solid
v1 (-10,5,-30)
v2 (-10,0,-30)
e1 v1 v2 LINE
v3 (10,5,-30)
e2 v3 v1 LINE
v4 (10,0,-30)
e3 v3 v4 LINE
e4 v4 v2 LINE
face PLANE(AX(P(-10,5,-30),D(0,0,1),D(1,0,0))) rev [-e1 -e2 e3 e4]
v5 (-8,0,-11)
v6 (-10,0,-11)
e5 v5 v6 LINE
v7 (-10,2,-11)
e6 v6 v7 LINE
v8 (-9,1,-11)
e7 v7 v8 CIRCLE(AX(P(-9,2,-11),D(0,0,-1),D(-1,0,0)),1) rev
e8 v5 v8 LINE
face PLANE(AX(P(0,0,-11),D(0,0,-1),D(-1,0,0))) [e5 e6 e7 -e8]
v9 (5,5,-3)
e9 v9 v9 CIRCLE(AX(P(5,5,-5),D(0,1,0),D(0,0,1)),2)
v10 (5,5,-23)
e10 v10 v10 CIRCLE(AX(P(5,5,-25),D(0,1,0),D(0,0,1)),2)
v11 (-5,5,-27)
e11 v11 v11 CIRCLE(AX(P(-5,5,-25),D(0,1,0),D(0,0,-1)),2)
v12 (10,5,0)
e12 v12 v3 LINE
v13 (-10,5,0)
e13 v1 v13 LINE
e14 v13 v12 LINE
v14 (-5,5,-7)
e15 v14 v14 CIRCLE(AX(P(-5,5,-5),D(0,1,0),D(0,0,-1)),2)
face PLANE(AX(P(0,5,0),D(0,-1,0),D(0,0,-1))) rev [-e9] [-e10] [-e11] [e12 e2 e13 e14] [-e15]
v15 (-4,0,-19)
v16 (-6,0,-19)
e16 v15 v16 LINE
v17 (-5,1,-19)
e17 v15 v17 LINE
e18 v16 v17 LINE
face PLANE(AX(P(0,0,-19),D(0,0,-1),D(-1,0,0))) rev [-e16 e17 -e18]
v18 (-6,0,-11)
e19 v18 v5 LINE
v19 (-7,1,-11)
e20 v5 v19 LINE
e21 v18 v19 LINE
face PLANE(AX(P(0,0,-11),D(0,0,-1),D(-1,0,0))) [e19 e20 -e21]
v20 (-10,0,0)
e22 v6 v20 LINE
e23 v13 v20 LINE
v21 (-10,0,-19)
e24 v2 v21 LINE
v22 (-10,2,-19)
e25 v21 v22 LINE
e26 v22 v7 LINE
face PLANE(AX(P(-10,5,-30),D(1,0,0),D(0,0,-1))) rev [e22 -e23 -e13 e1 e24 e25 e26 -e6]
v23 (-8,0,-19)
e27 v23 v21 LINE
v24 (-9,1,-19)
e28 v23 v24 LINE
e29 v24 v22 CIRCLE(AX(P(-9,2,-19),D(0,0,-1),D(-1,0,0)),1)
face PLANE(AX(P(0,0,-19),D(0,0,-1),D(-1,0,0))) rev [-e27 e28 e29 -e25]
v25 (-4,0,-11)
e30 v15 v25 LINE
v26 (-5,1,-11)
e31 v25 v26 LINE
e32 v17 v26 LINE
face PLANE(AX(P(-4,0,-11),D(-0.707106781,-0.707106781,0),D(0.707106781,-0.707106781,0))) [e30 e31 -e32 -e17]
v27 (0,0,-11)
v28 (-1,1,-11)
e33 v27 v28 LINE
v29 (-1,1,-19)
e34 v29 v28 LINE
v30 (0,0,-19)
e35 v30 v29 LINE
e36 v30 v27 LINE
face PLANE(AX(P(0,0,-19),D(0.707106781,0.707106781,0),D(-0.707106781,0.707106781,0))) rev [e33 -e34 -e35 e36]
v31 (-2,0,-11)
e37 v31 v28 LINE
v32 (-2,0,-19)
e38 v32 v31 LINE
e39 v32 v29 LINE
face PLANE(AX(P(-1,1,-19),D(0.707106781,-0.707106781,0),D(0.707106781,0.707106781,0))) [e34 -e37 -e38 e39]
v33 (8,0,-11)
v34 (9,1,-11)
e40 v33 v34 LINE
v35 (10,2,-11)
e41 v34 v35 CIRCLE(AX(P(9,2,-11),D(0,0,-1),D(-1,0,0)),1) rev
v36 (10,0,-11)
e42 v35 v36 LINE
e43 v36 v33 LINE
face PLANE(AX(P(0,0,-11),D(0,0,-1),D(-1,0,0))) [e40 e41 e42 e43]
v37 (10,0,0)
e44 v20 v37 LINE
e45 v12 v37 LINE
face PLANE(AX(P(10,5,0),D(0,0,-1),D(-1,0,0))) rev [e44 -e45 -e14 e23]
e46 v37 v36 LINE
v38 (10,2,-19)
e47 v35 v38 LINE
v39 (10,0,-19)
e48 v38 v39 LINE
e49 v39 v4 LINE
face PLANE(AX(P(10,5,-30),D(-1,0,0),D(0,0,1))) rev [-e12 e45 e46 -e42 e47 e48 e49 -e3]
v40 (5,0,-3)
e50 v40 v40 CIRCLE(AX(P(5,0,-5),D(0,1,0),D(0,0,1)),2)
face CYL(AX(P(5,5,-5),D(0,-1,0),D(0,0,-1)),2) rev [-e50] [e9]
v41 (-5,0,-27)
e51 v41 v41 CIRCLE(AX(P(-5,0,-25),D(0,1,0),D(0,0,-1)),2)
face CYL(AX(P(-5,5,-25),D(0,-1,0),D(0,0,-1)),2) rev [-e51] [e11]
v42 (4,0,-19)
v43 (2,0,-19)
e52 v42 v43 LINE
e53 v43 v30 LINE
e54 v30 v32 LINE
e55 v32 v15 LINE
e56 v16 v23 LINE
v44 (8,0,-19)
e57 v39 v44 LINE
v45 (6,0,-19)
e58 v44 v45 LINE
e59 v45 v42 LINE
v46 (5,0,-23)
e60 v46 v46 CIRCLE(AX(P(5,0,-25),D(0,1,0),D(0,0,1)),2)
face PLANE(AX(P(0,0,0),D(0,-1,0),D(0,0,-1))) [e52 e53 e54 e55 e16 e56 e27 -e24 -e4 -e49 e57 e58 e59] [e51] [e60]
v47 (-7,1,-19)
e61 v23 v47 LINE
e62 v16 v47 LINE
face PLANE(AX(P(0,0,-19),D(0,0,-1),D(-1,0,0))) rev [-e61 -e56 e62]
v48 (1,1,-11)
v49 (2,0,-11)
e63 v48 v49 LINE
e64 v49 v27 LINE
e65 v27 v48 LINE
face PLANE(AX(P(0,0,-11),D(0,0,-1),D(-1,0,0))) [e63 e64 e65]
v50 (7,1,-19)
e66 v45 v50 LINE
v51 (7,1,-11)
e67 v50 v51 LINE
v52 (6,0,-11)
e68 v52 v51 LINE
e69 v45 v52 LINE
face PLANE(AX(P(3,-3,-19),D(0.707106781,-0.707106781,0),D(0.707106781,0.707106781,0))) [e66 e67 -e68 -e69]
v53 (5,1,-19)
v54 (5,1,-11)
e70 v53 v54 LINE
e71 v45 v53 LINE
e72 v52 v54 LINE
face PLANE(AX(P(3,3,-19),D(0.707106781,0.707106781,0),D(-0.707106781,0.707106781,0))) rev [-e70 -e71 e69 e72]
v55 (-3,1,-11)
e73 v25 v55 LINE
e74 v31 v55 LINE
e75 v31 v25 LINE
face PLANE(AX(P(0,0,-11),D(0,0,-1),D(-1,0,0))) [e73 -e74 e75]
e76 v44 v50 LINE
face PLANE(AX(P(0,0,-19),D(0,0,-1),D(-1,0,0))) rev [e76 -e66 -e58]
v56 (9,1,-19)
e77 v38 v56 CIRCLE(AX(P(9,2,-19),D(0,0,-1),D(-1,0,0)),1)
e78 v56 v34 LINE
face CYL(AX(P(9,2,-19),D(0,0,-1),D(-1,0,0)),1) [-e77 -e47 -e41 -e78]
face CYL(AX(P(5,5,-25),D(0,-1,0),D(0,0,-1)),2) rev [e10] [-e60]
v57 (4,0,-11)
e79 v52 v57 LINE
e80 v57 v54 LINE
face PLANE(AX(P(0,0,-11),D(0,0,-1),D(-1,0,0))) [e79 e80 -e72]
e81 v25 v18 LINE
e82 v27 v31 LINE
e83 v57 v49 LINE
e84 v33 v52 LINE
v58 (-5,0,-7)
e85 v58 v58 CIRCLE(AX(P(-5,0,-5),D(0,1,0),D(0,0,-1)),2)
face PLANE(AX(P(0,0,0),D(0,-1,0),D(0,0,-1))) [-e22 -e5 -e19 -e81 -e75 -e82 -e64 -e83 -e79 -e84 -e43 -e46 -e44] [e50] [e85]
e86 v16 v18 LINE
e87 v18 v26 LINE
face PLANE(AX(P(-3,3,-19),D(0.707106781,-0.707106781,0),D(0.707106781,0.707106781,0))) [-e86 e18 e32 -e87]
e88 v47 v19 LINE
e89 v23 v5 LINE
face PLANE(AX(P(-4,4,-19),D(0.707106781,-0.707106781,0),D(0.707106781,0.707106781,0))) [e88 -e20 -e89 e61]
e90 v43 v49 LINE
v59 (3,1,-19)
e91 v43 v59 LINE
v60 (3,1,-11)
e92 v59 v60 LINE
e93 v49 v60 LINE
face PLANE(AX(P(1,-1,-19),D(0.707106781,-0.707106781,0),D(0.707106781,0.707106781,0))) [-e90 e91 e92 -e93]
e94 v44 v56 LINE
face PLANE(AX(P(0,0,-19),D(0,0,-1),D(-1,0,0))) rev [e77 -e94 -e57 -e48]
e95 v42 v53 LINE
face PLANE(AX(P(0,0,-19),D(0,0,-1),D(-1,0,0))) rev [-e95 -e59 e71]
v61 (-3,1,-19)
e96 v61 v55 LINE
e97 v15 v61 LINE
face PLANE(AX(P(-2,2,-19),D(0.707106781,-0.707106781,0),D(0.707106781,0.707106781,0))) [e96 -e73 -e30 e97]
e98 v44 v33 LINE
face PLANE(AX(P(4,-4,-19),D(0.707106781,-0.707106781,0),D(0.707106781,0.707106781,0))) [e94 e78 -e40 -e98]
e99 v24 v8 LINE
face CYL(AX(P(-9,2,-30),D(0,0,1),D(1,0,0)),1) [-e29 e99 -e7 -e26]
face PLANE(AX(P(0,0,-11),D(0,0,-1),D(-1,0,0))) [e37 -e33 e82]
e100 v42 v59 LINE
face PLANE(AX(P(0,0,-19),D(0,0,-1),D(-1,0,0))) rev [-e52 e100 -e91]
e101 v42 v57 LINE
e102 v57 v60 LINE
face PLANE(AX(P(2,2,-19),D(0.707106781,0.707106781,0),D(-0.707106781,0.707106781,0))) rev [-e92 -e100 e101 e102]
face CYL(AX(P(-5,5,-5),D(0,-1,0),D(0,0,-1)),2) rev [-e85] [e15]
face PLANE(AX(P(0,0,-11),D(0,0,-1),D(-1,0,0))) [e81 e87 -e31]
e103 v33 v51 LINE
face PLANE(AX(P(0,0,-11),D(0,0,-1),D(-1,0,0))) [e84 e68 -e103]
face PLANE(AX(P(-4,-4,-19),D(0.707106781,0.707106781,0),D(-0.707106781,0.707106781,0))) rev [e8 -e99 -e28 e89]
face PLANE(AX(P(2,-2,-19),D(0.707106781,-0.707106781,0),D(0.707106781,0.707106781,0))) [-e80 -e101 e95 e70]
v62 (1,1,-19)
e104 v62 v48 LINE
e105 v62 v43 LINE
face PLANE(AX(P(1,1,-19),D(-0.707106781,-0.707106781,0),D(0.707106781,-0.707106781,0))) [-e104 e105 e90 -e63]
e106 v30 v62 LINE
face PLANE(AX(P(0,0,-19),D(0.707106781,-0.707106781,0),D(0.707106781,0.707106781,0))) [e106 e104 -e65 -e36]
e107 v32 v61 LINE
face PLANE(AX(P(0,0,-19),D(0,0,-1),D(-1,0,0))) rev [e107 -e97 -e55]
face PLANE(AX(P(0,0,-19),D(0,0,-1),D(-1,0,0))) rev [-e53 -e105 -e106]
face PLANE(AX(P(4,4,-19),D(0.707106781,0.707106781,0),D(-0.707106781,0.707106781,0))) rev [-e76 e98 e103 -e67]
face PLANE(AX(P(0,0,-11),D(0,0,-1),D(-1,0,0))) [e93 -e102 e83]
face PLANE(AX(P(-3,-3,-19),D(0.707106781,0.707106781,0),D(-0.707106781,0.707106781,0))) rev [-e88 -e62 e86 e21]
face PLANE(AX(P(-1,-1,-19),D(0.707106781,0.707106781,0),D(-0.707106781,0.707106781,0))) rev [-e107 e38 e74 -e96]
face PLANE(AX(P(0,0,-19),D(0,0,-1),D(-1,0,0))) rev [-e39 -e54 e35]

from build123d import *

# Parameters (mm, degrees)
SKETCH_1_W               = 20
SKETCH_1_H               = 30
SKETCH_1_R               = 2
EXTRUDE_1_DEPTH          = 5
CUT_EXTRUDE_6_DEPTH      = 4
CUT_EXTRUDE_6_DEPTH_BACK = 4
CUT_EXTRUDE_6_START      = -15
FILLET_1_R               = 1


with BuildPart() as part:
    # 스케치1 → 보스-돌출1 (new body)
    with BuildSketch(Plane(origin=(0, 0, 0), x_dir=(1, 0, 0), z_dir=(0, 1, 0))):
        with Locations((0, 15)):
            Rectangle(SKETCH_1_W, SKETCH_1_H)
        with Locations(Location((5, 25, 0), (0, 0, 270))):
            Circle(SKETCH_1_R, mode=Mode.SUBTRACT)
        with Locations(Location((-5, 25, 0), (0, 0, 90))):
            Circle(SKETCH_1_R, mode=Mode.SUBTRACT)
        with Locations(Location((5, 5, 0), (0, 0, 270))):
            Circle(SKETCH_1_R, mode=Mode.SUBTRACT)
        with Locations(Location((-5, 5, 0), (0, 0, 90))):
            Circle(SKETCH_1_R, mode=Mode.SUBTRACT)
    extrude(amount=EXTRUDE_1_DEPTH)

    # 스케치3 → 컷-돌출6 (cut, two sides: drawn at the far end of the back side and taken through both)
    with BuildSketch(Plane(origin=(0, 0, -30), x_dir=(-1, 0, 0), z_dir=(0, 0, -1)).offset(CUT_EXTRUDE_6_START - CUT_EXTRUDE_6_DEPTH_BACK)):
        Polygon((0, 0), (-1, 1), (-2, 0), align=None)
        Polygon((1, 1), (0, 0), (2, 0), align=None)
        Polygon((-2, 0), (-3, 1), (-4, 0), align=None)
        Polygon((3, 1), (2, 0), (4, 0), align=None)
        Polygon((-4, 0), (-5, 1), (-6, 0), align=None)
        Polygon((5, 1), (4, 0), (6, 0), align=None)
        Polygon((-6, 0), (-7, 1), (-8, 0), align=None)
        Polygon((7, 1), (6, 0), (8, 0), align=None)
        Polygon((-8, 0), (-9, 1), (-10, 1), (-10, 0), align=None)
        Polygon((9, 1), (8, 0), (10, 0), (10, 1), align=None)
    extrude(amount=CUT_EXTRUDE_6_DEPTH + CUT_EXTRUDE_6_DEPTH_BACK, mode=Mode.SUBTRACT)

    # 필렛1
    fillet_1_edges = [part.edges().sort_by_distance(p)[0] for p in [
        (10, 1, -15),
        (-10, 1, -15),
    ]]
    fillet(fillet_1_edges, radius=FILLET_1_R - 0.0001)  # a hair under: the kernel refuses the full size


solid = part.part
